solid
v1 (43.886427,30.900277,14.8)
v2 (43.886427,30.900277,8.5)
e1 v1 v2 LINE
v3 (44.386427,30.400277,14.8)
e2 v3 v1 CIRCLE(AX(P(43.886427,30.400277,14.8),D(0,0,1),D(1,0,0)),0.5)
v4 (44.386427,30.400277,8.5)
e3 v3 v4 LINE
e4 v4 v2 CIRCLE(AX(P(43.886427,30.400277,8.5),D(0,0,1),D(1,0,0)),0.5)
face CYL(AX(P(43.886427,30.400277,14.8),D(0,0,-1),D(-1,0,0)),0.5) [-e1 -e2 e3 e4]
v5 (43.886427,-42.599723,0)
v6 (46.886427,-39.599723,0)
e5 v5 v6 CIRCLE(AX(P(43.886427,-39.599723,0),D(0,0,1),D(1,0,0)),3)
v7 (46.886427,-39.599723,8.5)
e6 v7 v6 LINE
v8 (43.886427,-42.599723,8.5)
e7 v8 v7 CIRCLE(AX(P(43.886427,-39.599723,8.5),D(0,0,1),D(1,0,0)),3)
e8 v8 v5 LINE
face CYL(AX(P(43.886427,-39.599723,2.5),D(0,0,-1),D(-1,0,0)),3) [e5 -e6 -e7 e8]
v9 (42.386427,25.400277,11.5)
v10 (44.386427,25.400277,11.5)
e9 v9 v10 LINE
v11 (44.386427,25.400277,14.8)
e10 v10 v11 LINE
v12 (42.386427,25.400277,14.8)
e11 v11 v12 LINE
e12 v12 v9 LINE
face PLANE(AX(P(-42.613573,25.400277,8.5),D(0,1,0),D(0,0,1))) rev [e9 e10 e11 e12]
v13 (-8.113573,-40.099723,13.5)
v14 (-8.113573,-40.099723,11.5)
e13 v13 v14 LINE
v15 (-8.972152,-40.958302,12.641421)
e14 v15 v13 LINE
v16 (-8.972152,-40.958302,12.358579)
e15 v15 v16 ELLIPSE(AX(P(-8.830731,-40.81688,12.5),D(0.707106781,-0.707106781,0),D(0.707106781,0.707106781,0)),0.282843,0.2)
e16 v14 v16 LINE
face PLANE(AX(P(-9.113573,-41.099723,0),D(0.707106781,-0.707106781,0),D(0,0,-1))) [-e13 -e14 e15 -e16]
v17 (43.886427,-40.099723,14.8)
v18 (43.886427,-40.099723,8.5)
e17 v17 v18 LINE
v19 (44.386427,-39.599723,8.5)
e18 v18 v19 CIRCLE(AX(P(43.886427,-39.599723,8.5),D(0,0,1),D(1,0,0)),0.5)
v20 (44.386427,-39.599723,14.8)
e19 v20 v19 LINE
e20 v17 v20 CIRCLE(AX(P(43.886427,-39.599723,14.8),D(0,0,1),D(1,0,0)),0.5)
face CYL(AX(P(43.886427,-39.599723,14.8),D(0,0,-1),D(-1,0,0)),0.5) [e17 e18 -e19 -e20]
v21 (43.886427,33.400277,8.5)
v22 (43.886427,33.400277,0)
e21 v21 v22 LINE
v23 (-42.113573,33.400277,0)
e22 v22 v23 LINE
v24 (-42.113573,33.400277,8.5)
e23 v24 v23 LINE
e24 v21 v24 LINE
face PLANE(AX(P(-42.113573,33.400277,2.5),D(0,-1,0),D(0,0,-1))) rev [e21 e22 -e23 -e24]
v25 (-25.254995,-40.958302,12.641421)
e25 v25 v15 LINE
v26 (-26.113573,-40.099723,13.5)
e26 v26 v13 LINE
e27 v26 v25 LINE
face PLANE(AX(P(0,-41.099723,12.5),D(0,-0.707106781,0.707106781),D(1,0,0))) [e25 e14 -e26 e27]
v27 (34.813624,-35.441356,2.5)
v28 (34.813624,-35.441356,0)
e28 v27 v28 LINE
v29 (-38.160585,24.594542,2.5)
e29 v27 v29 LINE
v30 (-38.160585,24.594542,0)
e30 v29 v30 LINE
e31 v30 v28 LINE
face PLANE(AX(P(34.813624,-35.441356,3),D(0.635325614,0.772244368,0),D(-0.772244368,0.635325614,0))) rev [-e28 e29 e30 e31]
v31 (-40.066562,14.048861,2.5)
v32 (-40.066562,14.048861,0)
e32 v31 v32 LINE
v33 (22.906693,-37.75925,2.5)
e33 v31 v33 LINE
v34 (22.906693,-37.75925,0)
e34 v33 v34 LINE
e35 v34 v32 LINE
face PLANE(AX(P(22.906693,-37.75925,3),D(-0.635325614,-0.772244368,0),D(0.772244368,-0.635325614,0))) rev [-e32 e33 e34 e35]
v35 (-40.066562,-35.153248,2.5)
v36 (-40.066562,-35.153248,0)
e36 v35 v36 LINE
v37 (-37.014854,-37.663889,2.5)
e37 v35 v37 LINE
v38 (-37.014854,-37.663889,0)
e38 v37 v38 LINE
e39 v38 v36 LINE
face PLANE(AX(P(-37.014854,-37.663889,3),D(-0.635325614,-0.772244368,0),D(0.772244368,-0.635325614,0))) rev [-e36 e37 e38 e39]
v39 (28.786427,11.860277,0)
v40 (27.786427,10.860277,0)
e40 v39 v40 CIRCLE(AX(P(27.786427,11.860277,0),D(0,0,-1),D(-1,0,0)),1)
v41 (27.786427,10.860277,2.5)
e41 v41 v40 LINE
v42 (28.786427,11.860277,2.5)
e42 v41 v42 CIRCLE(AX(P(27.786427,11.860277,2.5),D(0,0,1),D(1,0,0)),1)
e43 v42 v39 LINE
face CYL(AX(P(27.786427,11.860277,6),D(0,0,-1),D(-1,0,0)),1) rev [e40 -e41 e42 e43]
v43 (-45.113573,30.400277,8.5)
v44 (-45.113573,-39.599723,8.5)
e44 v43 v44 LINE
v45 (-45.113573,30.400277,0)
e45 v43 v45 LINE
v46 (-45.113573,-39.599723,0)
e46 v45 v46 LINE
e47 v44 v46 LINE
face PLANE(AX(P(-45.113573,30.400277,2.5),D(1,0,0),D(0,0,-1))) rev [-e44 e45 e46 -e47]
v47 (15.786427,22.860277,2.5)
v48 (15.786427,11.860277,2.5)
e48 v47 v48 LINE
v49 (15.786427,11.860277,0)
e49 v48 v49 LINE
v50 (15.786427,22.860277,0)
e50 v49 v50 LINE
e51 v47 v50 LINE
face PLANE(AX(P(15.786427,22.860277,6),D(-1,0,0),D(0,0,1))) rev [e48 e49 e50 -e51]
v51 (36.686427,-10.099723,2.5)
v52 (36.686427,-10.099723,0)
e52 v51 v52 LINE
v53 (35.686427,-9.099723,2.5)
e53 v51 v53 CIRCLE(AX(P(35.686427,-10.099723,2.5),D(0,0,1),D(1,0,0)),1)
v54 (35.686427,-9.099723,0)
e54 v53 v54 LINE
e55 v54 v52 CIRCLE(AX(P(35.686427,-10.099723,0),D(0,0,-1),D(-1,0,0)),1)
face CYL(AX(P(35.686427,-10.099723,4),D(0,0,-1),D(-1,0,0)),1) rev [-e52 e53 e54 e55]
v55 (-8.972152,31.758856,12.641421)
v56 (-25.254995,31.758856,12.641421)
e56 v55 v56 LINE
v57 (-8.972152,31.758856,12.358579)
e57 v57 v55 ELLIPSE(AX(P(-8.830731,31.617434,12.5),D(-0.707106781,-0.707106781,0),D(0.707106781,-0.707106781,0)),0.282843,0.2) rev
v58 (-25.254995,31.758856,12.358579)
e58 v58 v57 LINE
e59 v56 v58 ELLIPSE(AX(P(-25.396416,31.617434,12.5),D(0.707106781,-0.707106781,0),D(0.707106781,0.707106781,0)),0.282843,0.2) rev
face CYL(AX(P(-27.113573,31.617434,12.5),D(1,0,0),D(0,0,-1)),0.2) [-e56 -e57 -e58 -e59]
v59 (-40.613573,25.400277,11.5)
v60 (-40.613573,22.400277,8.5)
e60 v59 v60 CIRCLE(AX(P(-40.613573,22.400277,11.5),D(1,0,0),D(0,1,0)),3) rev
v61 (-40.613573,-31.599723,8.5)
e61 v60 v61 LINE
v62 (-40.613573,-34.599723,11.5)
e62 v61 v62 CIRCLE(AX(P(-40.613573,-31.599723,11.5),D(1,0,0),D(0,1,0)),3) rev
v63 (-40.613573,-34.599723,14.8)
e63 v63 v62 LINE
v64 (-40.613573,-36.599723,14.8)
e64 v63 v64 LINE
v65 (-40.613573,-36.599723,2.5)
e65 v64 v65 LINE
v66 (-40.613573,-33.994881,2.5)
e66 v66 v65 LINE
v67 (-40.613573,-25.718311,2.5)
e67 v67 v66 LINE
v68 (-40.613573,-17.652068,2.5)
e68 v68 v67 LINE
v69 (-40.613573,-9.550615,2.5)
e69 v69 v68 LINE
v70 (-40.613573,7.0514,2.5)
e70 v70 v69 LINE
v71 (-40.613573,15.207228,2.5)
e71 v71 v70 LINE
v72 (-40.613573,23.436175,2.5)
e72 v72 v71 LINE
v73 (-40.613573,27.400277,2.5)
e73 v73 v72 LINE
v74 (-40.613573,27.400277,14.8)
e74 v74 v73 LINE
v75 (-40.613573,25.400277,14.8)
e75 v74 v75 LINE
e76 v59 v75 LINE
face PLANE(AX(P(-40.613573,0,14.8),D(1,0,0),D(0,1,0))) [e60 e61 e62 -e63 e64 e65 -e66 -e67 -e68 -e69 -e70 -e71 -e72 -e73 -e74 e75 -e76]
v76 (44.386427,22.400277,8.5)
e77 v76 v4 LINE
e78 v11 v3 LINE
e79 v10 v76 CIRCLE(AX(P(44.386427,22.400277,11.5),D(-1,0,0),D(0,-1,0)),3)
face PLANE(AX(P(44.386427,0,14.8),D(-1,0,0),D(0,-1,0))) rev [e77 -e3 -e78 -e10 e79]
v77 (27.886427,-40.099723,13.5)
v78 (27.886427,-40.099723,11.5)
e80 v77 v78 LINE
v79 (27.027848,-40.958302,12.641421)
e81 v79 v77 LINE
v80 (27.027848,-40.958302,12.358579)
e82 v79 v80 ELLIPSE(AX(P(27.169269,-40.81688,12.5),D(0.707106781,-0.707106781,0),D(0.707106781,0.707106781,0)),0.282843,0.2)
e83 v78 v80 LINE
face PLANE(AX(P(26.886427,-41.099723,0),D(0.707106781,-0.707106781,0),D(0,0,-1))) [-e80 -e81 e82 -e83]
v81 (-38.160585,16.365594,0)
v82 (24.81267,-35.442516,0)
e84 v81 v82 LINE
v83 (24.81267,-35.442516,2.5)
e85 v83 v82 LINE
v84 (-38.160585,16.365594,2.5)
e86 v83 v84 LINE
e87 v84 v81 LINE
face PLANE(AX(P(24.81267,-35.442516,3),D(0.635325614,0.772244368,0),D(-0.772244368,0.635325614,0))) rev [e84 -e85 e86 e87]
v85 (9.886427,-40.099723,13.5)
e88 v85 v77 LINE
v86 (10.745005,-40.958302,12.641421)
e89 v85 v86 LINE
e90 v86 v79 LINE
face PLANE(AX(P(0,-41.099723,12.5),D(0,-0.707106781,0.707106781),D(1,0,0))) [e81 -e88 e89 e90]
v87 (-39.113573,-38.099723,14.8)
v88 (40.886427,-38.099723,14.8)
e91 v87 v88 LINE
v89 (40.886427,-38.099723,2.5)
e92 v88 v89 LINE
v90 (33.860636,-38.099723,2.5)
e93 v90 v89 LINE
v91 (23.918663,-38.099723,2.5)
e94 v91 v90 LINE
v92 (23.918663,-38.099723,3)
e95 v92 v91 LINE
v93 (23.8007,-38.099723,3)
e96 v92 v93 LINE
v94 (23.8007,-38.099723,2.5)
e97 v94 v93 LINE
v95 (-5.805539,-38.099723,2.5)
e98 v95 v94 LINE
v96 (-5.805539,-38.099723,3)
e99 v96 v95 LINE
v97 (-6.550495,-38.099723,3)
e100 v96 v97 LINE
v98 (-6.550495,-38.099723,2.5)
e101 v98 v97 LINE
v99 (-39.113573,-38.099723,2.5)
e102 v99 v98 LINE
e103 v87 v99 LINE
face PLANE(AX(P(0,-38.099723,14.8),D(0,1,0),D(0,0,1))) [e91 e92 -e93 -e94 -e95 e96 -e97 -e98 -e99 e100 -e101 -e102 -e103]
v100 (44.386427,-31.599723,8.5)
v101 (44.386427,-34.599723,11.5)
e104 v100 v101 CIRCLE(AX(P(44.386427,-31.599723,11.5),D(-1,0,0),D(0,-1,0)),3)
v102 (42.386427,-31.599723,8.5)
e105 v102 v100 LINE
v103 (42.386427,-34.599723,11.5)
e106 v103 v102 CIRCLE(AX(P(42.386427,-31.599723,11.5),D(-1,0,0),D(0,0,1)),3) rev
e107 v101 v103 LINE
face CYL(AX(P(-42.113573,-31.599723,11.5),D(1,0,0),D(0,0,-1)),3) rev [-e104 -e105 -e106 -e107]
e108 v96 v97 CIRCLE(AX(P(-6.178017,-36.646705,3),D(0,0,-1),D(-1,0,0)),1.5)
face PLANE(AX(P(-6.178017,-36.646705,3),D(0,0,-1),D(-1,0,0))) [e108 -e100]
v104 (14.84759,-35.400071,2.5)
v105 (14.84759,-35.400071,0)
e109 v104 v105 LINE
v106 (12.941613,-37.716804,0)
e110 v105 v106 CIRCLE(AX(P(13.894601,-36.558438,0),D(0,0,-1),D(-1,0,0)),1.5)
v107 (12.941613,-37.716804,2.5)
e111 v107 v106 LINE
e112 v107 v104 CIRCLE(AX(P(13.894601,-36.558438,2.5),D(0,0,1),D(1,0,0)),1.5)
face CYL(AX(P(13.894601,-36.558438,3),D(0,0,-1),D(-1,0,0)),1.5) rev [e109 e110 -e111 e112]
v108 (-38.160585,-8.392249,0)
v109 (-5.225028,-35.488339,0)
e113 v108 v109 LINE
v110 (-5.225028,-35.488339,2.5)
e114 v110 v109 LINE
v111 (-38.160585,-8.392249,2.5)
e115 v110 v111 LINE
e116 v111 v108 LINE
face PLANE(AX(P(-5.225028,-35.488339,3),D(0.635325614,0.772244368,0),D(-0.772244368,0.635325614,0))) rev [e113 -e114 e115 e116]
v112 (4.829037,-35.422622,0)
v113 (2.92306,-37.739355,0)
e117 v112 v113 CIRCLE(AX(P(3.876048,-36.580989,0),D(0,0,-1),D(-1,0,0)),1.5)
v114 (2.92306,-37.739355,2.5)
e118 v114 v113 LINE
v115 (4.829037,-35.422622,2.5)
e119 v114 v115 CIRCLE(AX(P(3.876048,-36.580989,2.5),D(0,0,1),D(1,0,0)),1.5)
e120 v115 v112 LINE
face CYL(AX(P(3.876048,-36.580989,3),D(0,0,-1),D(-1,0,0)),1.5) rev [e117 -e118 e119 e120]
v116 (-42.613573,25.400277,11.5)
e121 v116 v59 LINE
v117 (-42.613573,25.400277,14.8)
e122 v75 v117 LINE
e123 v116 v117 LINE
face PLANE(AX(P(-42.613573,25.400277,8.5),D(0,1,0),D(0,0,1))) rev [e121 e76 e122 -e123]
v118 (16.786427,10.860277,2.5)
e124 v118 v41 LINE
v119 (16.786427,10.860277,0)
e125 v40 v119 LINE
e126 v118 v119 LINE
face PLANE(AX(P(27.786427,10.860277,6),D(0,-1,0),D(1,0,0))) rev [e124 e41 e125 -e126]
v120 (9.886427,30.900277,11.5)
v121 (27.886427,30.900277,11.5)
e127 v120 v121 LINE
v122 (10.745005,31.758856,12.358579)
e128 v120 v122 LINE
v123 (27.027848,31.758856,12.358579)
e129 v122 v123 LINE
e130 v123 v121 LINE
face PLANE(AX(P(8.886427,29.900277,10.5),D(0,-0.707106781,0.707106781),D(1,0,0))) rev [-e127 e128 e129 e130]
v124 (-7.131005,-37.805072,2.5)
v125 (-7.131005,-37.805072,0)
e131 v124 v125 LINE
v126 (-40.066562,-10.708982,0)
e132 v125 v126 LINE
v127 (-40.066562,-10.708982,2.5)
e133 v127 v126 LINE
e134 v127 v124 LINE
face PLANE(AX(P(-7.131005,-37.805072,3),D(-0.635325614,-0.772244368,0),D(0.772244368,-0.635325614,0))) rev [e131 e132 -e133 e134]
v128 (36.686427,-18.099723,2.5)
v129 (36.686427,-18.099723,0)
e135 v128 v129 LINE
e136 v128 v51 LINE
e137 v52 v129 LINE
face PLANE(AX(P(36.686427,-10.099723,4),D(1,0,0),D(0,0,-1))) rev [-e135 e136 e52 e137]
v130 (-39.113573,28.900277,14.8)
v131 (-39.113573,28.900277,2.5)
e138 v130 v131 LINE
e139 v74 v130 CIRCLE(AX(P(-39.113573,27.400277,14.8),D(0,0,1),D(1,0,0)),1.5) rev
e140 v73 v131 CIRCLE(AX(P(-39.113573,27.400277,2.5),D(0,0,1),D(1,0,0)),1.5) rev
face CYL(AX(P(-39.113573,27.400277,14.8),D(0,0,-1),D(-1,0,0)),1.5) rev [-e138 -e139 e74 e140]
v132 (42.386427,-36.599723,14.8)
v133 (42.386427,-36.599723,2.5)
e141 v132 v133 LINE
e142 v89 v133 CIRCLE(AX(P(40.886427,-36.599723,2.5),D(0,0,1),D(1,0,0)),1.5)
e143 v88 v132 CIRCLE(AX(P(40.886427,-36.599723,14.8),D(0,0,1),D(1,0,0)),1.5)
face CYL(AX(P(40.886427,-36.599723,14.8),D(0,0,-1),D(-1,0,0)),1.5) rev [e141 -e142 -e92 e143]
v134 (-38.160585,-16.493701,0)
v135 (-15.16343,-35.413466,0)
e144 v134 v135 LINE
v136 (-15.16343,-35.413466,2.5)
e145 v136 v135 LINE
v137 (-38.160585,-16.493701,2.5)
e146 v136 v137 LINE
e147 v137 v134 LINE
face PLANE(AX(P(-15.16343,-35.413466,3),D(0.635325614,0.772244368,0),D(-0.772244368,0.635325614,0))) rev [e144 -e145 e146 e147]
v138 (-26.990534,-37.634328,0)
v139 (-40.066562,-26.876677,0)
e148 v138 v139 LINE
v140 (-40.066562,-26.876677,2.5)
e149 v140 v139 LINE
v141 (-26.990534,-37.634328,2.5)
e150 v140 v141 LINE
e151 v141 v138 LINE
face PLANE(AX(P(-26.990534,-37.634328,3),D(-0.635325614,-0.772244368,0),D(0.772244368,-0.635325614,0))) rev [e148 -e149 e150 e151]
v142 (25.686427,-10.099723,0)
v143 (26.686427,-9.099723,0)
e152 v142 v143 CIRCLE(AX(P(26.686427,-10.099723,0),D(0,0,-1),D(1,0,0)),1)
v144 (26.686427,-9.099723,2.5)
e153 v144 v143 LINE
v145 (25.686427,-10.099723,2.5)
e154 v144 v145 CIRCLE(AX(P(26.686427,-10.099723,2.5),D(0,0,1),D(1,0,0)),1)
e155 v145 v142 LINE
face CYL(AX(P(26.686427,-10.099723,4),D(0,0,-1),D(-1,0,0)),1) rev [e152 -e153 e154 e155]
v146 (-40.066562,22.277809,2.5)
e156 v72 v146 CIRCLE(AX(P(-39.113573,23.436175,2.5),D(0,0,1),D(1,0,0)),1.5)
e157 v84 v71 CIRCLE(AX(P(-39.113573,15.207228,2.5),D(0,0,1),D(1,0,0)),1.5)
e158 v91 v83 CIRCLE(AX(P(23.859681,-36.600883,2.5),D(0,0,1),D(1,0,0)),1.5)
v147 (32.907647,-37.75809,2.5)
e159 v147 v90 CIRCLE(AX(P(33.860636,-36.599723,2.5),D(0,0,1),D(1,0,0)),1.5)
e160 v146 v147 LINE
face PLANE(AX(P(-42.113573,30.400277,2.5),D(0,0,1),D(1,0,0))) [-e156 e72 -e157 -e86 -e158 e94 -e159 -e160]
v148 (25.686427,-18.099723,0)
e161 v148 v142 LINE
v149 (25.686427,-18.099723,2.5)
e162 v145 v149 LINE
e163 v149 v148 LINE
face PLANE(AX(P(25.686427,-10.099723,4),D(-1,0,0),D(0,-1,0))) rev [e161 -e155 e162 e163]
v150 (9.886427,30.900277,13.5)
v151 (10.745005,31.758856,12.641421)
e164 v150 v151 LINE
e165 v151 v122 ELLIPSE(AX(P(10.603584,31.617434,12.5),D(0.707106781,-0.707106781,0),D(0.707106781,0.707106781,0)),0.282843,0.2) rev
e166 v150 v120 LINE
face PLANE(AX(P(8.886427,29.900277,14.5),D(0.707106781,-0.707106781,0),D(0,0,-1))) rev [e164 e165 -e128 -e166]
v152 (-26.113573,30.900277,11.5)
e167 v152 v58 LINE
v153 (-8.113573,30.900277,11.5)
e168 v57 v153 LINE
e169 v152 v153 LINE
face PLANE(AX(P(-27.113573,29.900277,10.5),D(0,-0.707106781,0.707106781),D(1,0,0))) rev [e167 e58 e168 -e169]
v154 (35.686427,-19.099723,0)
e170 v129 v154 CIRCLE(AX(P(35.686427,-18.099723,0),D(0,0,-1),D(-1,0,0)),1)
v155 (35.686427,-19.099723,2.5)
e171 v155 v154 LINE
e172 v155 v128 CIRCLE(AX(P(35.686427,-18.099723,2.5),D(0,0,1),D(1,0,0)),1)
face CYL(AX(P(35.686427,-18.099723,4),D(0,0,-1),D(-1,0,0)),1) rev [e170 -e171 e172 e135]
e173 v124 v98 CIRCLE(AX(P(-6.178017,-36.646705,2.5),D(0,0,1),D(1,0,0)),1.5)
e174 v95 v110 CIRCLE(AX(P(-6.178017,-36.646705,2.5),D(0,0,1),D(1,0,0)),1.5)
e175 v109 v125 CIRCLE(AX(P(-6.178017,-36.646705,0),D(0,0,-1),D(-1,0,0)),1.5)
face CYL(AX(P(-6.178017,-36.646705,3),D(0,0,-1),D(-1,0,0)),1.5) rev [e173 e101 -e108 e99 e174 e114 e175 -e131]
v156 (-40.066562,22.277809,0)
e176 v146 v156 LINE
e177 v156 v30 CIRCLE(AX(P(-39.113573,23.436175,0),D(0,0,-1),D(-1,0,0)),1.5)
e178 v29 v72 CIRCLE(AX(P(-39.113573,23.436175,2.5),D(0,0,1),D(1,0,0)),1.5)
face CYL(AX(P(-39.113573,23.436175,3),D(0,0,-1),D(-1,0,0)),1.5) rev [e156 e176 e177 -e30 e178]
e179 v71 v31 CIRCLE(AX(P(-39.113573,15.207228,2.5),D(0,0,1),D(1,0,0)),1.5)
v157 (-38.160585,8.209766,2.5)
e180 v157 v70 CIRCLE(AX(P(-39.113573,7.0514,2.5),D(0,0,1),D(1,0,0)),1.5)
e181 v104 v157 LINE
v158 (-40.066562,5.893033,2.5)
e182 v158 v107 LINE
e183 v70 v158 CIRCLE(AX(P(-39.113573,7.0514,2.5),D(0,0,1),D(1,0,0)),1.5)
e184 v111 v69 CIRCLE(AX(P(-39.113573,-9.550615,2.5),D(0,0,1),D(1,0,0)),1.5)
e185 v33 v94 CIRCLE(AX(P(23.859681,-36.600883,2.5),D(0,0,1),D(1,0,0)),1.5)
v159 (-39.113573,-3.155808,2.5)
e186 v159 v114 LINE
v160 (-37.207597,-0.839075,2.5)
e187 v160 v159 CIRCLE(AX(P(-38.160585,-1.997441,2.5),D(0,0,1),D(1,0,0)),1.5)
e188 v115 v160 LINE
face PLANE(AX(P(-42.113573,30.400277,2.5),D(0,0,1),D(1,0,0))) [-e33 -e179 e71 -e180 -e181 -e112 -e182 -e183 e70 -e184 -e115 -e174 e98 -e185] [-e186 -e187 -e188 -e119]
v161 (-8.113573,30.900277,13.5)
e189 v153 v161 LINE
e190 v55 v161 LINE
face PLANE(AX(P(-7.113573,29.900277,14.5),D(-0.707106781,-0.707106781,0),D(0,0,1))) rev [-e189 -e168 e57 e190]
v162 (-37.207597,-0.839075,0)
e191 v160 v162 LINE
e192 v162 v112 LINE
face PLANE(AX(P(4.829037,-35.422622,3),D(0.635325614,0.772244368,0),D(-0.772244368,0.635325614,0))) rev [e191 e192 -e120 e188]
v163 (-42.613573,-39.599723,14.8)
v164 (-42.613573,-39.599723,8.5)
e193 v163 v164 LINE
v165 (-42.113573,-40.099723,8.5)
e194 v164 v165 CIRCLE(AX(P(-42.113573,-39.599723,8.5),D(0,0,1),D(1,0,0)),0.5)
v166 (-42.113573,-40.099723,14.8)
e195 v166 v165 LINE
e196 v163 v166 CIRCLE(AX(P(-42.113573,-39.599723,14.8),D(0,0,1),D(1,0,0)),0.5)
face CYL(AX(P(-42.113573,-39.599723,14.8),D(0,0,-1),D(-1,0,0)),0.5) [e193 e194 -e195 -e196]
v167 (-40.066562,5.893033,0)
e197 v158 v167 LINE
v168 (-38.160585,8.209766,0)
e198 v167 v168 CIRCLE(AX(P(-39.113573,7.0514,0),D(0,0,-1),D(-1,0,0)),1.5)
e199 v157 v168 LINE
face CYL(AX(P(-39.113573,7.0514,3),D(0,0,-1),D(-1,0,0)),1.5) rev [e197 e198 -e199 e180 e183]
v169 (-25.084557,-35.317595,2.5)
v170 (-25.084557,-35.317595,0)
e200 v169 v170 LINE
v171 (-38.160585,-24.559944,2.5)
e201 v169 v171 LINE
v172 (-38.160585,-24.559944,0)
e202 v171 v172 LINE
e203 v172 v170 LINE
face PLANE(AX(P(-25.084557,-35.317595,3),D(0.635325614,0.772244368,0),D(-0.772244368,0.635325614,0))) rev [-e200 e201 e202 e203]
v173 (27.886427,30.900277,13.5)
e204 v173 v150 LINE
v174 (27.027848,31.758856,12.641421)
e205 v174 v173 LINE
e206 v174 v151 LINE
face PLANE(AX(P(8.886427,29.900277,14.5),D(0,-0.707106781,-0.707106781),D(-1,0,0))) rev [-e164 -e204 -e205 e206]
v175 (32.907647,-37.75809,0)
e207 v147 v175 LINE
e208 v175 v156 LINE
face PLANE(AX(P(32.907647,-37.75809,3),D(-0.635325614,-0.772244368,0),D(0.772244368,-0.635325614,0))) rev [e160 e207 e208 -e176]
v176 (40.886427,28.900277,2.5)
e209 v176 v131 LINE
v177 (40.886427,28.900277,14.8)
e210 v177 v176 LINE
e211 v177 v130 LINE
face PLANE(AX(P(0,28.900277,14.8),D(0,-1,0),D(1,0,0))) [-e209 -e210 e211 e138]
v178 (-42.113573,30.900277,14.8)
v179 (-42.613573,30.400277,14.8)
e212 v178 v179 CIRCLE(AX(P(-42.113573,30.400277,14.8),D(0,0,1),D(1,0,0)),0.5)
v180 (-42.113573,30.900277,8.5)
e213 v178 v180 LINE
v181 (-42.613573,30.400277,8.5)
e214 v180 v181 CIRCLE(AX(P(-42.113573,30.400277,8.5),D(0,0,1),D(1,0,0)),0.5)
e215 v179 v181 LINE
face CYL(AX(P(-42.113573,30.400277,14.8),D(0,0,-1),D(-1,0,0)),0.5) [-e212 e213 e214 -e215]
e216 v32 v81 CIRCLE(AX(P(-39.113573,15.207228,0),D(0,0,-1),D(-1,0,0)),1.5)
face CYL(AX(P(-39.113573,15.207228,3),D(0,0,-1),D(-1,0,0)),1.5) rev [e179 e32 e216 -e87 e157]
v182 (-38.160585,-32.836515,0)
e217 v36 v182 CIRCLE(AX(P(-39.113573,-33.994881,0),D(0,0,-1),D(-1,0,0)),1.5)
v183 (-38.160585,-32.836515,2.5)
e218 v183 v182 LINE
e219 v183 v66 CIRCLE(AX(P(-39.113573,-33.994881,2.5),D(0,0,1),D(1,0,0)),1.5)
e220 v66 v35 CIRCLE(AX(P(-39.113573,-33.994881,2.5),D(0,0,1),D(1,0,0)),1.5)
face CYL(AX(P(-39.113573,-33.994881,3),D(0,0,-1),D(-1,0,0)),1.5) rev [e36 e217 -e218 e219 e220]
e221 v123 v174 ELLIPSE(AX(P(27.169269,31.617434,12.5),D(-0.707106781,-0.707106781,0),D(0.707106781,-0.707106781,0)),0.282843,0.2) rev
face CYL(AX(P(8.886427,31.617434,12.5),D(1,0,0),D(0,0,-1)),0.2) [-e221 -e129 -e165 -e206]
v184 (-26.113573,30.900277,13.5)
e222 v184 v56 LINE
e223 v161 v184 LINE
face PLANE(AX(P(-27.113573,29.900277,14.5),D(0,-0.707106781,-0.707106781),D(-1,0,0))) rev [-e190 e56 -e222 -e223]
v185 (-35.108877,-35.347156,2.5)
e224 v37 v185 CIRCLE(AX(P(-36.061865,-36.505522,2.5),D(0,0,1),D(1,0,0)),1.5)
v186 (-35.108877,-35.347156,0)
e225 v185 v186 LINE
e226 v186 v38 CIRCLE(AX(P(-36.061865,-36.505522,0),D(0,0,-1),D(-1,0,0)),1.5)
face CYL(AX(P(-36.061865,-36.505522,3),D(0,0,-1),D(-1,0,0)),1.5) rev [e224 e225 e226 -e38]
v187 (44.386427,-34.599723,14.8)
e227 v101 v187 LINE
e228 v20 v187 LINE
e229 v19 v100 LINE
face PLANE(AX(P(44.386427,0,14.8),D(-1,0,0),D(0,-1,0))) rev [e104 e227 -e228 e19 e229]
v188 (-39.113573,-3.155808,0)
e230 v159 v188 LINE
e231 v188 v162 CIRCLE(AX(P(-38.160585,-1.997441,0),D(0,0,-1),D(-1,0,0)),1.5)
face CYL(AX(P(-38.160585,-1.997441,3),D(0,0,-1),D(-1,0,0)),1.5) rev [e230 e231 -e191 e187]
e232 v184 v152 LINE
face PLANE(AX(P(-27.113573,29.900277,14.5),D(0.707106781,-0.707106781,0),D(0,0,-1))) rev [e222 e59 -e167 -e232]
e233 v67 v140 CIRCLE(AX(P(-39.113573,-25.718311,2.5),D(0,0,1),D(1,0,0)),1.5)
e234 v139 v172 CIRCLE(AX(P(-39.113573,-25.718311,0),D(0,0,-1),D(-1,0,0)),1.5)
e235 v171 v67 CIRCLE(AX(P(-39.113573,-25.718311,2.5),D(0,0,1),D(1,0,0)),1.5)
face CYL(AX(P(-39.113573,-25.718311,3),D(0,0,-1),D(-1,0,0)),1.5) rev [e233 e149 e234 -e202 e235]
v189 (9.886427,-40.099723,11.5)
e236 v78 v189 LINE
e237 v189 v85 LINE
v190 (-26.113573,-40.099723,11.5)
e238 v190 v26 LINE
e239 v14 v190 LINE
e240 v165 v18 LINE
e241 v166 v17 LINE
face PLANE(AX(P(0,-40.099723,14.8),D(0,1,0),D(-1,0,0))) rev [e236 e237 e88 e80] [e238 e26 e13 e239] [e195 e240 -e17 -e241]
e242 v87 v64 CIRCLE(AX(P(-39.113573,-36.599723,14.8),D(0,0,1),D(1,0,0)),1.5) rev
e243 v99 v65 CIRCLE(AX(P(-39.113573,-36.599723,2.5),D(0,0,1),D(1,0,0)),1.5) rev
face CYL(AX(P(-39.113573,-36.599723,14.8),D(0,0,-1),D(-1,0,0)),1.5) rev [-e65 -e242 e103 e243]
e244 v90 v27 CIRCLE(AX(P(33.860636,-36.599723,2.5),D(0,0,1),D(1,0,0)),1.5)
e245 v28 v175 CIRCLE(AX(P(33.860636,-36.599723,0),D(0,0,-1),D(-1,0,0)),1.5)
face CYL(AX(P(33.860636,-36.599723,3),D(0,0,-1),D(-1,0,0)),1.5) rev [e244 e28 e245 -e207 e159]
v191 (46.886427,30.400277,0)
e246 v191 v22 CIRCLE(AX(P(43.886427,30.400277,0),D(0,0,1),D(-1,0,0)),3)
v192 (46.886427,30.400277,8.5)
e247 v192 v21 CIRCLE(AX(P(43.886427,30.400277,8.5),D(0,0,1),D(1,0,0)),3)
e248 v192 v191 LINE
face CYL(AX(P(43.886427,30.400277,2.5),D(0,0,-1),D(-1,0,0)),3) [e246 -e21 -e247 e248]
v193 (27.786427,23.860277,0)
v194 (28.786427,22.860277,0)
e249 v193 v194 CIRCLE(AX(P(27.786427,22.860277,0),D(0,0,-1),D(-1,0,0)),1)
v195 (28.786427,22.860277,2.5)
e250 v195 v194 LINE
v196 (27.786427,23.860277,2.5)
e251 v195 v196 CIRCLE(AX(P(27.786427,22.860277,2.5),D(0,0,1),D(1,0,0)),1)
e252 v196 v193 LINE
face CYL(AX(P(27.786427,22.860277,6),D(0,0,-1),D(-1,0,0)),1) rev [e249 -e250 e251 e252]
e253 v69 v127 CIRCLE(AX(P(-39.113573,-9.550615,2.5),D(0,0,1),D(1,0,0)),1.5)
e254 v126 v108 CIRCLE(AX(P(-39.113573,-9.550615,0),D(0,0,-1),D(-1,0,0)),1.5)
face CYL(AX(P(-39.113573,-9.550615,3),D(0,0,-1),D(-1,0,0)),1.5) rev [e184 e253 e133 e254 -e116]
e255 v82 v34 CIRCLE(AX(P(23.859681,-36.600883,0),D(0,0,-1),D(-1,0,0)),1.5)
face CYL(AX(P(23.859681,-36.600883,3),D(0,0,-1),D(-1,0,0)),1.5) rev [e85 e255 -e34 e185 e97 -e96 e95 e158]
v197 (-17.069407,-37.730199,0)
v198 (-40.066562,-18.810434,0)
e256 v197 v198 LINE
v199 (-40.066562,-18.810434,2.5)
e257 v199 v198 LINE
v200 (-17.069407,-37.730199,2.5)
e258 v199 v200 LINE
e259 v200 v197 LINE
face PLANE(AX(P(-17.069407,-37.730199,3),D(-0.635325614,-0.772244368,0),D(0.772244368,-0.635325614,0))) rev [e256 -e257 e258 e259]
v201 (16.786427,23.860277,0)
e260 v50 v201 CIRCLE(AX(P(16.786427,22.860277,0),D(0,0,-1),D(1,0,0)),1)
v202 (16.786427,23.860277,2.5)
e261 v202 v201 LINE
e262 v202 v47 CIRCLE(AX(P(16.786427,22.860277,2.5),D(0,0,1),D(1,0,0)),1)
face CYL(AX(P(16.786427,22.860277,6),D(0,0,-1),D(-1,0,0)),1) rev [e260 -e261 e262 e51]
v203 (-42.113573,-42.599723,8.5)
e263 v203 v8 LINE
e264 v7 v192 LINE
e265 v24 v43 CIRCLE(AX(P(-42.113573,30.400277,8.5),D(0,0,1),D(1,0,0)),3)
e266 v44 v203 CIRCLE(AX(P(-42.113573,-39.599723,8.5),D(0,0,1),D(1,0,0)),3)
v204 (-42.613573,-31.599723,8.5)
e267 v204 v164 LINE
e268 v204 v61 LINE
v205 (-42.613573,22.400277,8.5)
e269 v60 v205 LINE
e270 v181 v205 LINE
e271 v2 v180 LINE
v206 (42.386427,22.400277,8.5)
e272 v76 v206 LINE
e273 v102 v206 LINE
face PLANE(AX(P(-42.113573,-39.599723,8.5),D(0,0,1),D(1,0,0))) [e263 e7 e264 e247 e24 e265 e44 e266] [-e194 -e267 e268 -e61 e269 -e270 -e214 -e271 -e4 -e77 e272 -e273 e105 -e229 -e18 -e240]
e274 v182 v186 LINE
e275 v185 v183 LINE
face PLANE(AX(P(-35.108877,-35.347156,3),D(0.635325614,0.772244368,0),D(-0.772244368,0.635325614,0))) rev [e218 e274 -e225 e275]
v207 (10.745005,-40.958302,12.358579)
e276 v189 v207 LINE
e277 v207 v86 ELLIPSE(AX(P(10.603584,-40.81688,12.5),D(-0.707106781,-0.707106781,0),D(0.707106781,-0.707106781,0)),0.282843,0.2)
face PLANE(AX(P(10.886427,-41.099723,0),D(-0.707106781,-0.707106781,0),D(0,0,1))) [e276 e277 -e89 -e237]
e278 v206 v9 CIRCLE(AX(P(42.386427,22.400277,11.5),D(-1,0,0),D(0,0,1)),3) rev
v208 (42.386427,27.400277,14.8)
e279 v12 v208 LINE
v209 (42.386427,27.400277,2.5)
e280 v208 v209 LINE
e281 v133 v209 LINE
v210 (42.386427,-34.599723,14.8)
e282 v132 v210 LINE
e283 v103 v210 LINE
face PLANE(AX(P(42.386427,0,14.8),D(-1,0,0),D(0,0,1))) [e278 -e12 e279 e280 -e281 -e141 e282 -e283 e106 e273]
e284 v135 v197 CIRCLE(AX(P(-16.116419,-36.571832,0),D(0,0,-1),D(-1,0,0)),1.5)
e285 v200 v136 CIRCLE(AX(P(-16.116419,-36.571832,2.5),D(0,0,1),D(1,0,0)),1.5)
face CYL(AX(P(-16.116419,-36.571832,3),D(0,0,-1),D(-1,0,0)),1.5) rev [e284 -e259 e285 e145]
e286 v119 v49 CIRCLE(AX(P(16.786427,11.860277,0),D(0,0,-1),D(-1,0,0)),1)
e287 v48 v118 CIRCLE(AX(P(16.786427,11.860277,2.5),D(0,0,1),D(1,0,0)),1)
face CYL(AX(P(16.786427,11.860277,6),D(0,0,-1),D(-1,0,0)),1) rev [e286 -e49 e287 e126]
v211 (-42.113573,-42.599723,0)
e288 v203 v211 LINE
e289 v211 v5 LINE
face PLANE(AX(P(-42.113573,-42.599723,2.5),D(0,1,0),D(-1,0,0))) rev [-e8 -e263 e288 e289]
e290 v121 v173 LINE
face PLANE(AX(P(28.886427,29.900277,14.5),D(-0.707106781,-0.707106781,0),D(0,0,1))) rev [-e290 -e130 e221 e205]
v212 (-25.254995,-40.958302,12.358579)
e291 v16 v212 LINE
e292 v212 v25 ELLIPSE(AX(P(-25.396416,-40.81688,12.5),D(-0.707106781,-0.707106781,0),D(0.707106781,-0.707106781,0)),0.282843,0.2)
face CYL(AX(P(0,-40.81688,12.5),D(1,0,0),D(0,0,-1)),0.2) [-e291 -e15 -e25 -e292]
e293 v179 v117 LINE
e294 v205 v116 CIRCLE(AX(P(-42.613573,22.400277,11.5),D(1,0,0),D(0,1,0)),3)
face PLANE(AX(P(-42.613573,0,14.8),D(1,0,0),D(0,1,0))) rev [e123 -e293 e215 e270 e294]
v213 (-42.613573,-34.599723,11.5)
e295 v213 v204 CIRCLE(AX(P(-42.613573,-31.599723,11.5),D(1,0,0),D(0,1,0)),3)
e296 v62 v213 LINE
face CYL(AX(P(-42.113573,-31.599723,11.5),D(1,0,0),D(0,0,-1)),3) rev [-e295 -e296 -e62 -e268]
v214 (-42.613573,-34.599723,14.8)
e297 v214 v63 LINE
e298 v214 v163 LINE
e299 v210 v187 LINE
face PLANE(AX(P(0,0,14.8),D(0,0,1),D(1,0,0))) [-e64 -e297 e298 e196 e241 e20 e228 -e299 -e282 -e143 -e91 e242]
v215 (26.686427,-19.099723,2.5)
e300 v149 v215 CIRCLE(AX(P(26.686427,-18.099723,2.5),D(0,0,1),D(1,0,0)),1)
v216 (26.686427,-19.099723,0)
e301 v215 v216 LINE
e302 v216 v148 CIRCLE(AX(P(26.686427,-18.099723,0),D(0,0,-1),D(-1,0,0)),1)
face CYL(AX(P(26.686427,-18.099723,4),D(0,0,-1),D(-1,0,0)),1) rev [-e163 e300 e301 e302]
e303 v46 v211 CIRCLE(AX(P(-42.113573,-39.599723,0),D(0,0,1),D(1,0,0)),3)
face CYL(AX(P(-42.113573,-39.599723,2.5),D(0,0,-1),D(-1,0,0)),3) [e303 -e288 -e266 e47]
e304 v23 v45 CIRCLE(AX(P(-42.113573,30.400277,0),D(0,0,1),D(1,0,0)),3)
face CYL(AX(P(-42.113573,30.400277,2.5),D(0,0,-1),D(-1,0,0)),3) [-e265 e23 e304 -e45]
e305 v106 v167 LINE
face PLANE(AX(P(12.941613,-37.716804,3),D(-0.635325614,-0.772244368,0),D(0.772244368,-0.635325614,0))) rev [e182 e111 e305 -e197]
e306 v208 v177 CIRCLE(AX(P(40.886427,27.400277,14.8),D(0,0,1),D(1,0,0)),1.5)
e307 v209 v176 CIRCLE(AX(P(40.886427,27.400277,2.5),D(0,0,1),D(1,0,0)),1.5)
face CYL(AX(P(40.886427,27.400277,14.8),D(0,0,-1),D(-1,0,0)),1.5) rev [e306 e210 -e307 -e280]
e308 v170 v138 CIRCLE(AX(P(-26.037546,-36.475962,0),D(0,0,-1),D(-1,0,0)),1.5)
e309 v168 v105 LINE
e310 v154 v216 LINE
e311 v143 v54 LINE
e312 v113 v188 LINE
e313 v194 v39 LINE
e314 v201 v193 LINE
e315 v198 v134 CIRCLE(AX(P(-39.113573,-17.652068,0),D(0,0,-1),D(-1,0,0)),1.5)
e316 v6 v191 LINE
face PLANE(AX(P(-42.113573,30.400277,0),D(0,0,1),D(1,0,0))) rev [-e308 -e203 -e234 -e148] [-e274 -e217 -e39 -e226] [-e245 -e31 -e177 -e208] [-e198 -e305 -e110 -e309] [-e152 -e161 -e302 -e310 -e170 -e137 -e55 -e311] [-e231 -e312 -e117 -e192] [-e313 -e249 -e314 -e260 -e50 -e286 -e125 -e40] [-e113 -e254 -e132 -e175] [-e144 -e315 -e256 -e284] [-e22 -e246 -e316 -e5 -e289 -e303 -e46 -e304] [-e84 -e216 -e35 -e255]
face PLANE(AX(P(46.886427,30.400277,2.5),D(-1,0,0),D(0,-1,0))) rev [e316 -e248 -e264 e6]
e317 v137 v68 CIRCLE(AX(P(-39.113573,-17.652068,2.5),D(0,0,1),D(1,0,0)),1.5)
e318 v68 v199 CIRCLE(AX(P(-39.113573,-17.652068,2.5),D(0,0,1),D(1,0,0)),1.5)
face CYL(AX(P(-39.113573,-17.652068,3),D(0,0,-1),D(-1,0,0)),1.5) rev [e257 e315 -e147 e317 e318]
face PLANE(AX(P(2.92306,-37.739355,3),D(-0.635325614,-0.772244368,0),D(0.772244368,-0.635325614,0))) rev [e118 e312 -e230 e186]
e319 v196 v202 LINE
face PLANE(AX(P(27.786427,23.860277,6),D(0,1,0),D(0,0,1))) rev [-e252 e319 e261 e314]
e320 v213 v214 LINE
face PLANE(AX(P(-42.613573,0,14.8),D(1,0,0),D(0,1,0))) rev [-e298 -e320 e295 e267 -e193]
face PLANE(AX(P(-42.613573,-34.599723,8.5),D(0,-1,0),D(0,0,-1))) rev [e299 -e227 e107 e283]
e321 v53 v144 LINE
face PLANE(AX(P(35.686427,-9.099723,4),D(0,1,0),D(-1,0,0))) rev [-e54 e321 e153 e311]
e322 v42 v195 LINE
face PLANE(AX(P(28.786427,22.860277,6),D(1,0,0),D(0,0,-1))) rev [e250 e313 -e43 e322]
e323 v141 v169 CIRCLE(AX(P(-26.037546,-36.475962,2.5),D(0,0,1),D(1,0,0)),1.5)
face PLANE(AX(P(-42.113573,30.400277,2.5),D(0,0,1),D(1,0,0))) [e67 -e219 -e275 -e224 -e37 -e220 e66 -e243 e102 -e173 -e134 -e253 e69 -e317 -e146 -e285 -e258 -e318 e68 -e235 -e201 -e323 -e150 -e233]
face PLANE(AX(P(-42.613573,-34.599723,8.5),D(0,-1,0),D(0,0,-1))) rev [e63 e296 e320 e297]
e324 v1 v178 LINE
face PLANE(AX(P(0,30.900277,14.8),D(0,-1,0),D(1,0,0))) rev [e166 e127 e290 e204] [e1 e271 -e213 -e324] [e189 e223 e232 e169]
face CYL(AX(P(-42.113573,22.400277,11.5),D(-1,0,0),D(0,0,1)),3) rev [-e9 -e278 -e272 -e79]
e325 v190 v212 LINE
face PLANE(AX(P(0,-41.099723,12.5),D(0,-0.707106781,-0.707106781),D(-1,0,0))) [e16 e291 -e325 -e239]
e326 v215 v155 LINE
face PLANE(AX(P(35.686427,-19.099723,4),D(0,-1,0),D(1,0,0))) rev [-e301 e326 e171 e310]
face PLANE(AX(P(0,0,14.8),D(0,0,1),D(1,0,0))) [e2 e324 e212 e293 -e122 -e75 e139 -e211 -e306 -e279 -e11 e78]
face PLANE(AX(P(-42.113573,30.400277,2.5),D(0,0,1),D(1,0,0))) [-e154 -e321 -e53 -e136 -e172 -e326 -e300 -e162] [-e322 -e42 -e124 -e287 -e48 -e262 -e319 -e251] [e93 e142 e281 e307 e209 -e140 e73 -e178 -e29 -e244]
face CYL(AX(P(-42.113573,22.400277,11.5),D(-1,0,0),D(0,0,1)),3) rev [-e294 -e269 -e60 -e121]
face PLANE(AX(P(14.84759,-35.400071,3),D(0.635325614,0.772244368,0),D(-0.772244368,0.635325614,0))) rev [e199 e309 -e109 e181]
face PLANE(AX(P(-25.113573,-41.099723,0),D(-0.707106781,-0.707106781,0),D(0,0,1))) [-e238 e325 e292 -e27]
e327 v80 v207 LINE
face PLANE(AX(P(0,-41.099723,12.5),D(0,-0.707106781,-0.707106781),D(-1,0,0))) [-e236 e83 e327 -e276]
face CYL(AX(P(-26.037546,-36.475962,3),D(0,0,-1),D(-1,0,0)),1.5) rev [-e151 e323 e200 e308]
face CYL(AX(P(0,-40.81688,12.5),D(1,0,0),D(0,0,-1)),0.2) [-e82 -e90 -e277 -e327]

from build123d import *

# Parameters (mm, degrees)
EXTRUDE_1_DEPTH     = 2.5
EXTRUDE_6_DEPTH     = 6
EXTRUDE_7_DEPTH     = 12.3
SKETCH_7_W          = 20
SKETCH_7_H          = 4
EXTRUDE_8_DEPTH     = 1
CHAMFER_12_SIZE     = 2
CHAMFER_13_SIZE     = 2
FILLET_4_R          = 0.2
FILLET_5_R          = 0.2
MIRROR_START        = 8.886426593
MIRROR_1_OUTLINE_W  = 1
MIRROR_1_OUTLINE_H  = 4
MIRROR_1_DEPTH      = 20
MIRROR_START_2      = -26.113573407
MIRROR_1_2_DEPTH    = 18
MIRROR_START_3      = 11
MIRROR_1_3_DEPTH    = 3
CHAMFER_14_SIZE     = 2
FILLET_6_R          = 0.2
SKETCH_8_W          = 87
SKETCH_8_H          = 60
CUT_EXTRUDE_1_DEPTH = 6.3
FILLET_7_R          = 3
FILLET_8_R          = 3
FILLET_9_R          = 3
FILLET_10_R         = 3
CUT_EXTRUDE_2_DEPTH = 4
CUT_EXTRUDE_4_DEPTH = 6
CUT_EXTRUDE_5_DEPTH = 3


with BuildPart() as part:
    # 草图1 → 凸台-拉伸1 (new body)
    with BuildSketch(Plane.XY):
        with BuildLine():
            Line((-42.113573407, 33.400277008), (43.886426593, 33.400277008))
            ThreePointArc((43.886426593, 33.400277008), (46.007746936, 32.521597352), (46.886426593, 30.400277008))
            Line((46.886426593, 30.400277008), (46.886426593, -39.599722992))
            ThreePointArc((46.886426593, -39.599722992), (46.007746936, -41.721043335), (43.886426593, -42.599722992))
            Line((43.886426593, -42.599722992), (-42.113573407, -42.599722992))
            ThreePointArc((-42.113573407, -42.599722992), (-44.234893751, -41.721043335), (-45.113573407, -39.599722992))
            Line((-45.113573407, -39.599722992), (-45.113573407, 30.400277008))
            ThreePointArc((-45.113573407, 30.400277008), (-44.234893751, 32.521597352), (-42.113573407, 33.400277008))
        make_face()
    extrude(amount=EXTRUDE_1_DEPTH)

    # 草图2 → 凸台-拉伸6 (add)
    with BuildSketch(Plane.XY.offset(2.5)):
        with BuildLine():
            Line((-42.113573407, -42.599722992), (43.886426593, -42.599722992))
            ThreePointArc((43.886426593, -42.599722992), (46.007746936, -41.721043335), (46.886426593, -39.599722992))
            Line((46.886426593, -39.599722992), (46.886426593, 30.400277008))
            ThreePointArc((46.886426593, 30.400277008), (46.007746936, 32.521597352), (43.886426593, 33.400277008))
            Line((43.886426593, 33.400277008), (-42.113573407, 33.400277008))
            ThreePointArc((-42.113573407, 33.400277008), (-44.234893751, 32.521597352), (-45.113573407, 30.400277008))
            Line((-45.113573407, 30.400277008), (-45.113573407, -39.599722992))
            ThreePointArc((-45.113573407, -39.599722992), (-44.234893751, -41.721043335), (-42.113573407, -42.599722992))
        make_face()
        with BuildLine():
            Line((43.886426593, 30.900277008), (-42.113573407, 30.900277008))
            ThreePointArc((-42.113573407, 30.900277008), (-42.467126798, 30.753830399), (-42.613573407, 30.400277008))
            Line((-42.613573407, 30.400277008), (-42.613573407, -39.599722992))
            ThreePointArc((-42.613573407, -39.599722992), (-42.467126798, -39.953276382), (-42.113573407, -40.099722992))
            Line((-42.113573407, -40.099722992), (43.886426593, -40.099722992))
            ThreePointArc((43.886426593, -40.099722992), (44.239979983, -39.953276382), (44.386426593, -39.599722992))
            Line((44.386426593, -39.599722992), (44.386426593, 30.400277008))
            ThreePointArc((44.386426593, 30.400277008), (44.239979983, 30.753830399), (43.886426593, 30.900277008))
        make_face(mode=Mode.SUBTRACT)
    extrude(amount=EXTRUDE_6_DEPTH)

    # 草图6 → 凸台-拉伸7 (add)
    with BuildSketch(Plane.XY.offset(2.5)):
        with BuildLine():
            Line((44.386426593, -39.599722992), (44.386426593, 30.400277008))
            ThreePointArc((44.386426593, 30.400277008), (44.239979983, 30.753830399), (43.886426593, 30.900277008))
            Line((43.886426593, 30.900277008), (-42.113573407, 30.900277008))
            ThreePointArc((-42.113573407, 30.900277008), (-42.467126798, 30.753830399), (-42.613573407, 30.400277008))
            Line((-42.613573407, 30.400277008), (-42.613573407, -39.599722992))
            ThreePointArc((-42.613573407, -39.599722992), (-42.467126798, -39.953276382), (-42.113573407, -40.099722992))
            Line((-42.113573407, -40.099722992), (43.886426593, -40.099722992))
            ThreePointArc((43.886426593, -40.099722992), (44.239979983, -39.953276382), (44.386426593, -39.599722992))
        make_face()
        with BuildLine():
            Line((-40.613573407, 27.400277008), (-40.613573407, -36.599722992))
            ThreePointArc((-40.613573407, -36.599722992), (-40.174233579, -37.660383163), (-39.113573407, -38.099722992))
            Line((-39.113573407, -38.099722992), (40.886426593, -38.099722992))
            ThreePointArc((40.886426593, -38.099722992), (41.947086765, -37.660383163), (42.386426593, -36.599722992))
            Line((42.386426593, -36.599722992), (42.386426593, 27.400277008))
            ThreePointArc((42.386426593, 27.400277008), (41.947086765, 28.46093718), (40.886426593, 28.900277008))
            Line((40.886426593, 28.900277008), (-39.113573407, 28.900277008))
            ThreePointArc((-39.113573407, 28.900277008), (-40.174233579, 28.46093718), (-40.613573407, 27.400277008))
        make_face(mode=Mode.SUBTRACT)
    extrude(amount=EXTRUDE_7_DEPTH)

    # 草图7 → 凸台-拉伸8 (add)
    with BuildSketch(Plane.XZ.offset(40.099722992)):
        with Locations((-17.113573407, 12.5)):
            Rectangle(SKETCH_7_W, SKETCH_7_H)
        with Locations((18.886426593, 12.5)):
            Rectangle(SKETCH_7_W, SKETCH_7_H)
    extrude(amount=EXTRUDE_8_DEPTH)

    # 倒角12
    # the kernel refuses this chamfer: 2 mm, written as the material it takes off along each edge
    with BuildSketch(Plane(origin=(-32.256939383, -41.099722992, 14.5), x_dir=(0, 1, 0), z_dir=(1, 0, 0))) as chamfer_12_piece_1_section:
        Polygon((CHAMFER_12_SIZE, 0), (0, -CHAMFER_12_SIZE), (0, 0), align=None)
    chamfer_12_piece_1 = extrude(amount=30.286731952, mode=Mode.PRIVATE)
    chamfer_12_piece_1 = split(chamfer_12_piece_1, bisect_by=Plane(origin=(-32.256939383, -40.099722992, 14.5), z_dir=(0, -1, 0)), keep=Keep.TOP, mode=Mode.PRIVATE)
    add(chamfer_12_piece_1, mode=Mode.SUBTRACT)
    with BuildSketch(Plane(origin=(-7.113573407, -41.099722992, 19.643365976), x_dir=(0, 1, 0), z_dir=(0, 0, -1))) as chamfer_12_piece_2_section:
        Polygon((CHAMFER_12_SIZE, 0), (0, -CHAMFER_12_SIZE), (0, 0), align=None)
    chamfer_12_piece_2 = extrude(amount=9.143365976, mode=Mode.PRIVATE)
    chamfer_12_piece_2 = split(chamfer_12_piece_2, bisect_by=Plane(origin=(-7.113573407, -40.099722992, 19.643365976), z_dir=(0, -1, 0)), keep=Keep.TOP, mode=Mode.PRIVATE)
    add(chamfer_12_piece_2, mode=Mode.SUBTRACT)
    with BuildSketch(Plane(origin=(-1.970207431, -41.099722992, 10.5), x_dir=(0, 1, 0), z_dir=(-1, 0, 0))) as chamfer_12_piece_3_section:
        Polygon((CHAMFER_12_SIZE, 0), (0, -CHAMFER_12_SIZE), (0, 0), align=None)
    chamfer_12_piece_3 = extrude(amount=30.286731952, mode=Mode.PRIVATE)
    chamfer_12_piece_3 = split(chamfer_12_piece_3, bisect_by=Plane(origin=(-1.970207431, -40.099722992, 10.5), z_dir=(0, -1, 0)), keep=Keep.TOP, mode=Mode.PRIVATE)
    add(chamfer_12_piece_3, mode=Mode.SUBTRACT)
    with BuildSketch(Plane(origin=(-27.113573407, -41.099722992, 10.5), x_dir=(0, 1, 0), z_dir=(0, 0, 1))) as chamfer_12_piece_4_section:
        Polygon((CHAMFER_12_SIZE, 0), (0, -CHAMFER_12_SIZE), (0, 0), align=None)
    chamfer_12_piece_4 = extrude(amount=9.143365976, mode=Mode.PRIVATE)
    chamfer_12_piece_4 = split(chamfer_12_piece_4, bisect_by=Plane(origin=(-27.113573407, -40.099722992, 10.5), z_dir=(0, -1, 0)), keep=Keep.TOP, mode=Mode.PRIVATE)
    add(chamfer_12_piece_4, mode=Mode.SUBTRACT)

    # 倒角13
    # the kernel refuses this chamfer: 2 mm, written as the material it takes off along each edge
    with BuildSketch(Plane(origin=(3.743060617, -41.099722992, 14.5), x_dir=(0, 0, -1), z_dir=(1, 0, 0))) as chamfer_13_piece_1_section:
        Polygon((CHAMFER_13_SIZE, 0), (0, CHAMFER_13_SIZE), (0, 0), align=None)
    chamfer_13_piece_1 = extrude(amount=30.286731952, mode=Mode.PRIVATE)
    chamfer_13_piece_1 = split(chamfer_13_piece_1, bisect_by=Plane(origin=(3.743060617, -40.099722992, 14.5), z_dir=(0, -1, 0)), keep=Keep.TOP, mode=Mode.PRIVATE)
    add(chamfer_13_piece_1, mode=Mode.SUBTRACT)
    with BuildSketch(Plane(origin=(28.886426593, -41.099722992, 19.643365976), x_dir=(0, 1, 0), z_dir=(0, 0, -1))) as chamfer_13_piece_2_section:
        Polygon((CHAMFER_13_SIZE, 0), (0, -CHAMFER_13_SIZE), (0, 0), align=None)
    chamfer_13_piece_2 = extrude(amount=9.143365976, mode=Mode.PRIVATE)
    chamfer_13_piece_2 = split(chamfer_13_piece_2, bisect_by=Plane(origin=(28.886426593, -40.099722992, 19.643365976), z_dir=(0, -1, 0)), keep=Keep.TOP, mode=Mode.PRIVATE)
    add(chamfer_13_piece_2, mode=Mode.SUBTRACT)
    with BuildSketch(Plane(origin=(34.029792569, -41.099722992, 10.5), x_dir=(0, 0, 1), z_dir=(-1, 0, 0))) as chamfer_13_piece_3_section:
        Polygon((CHAMFER_13_SIZE, 0), (0, CHAMFER_13_SIZE), (0, 0), align=None)
    chamfer_13_piece_3 = extrude(amount=30.286731952, mode=Mode.PRIVATE)
    chamfer_13_piece_3 = split(chamfer_13_piece_3, bisect_by=Plane(origin=(34.029792569, -40.099722992, 10.5), z_dir=(0, -1, 0)), keep=Keep.TOP, mode=Mode.PRIVATE)
    add(chamfer_13_piece_3, mode=Mode.SUBTRACT)
    with BuildSketch(Plane(origin=(8.886426593, -41.099722992, 10.5), x_dir=(1, 0, 0), z_dir=(0, 0, 1))) as chamfer_13_piece_4_section:
        Polygon((CHAMFER_13_SIZE, 0), (0, CHAMFER_13_SIZE), (0, 0), align=None)
    chamfer_13_piece_4 = extrude(amount=9.143365976, mode=Mode.PRIVATE)
    chamfer_13_piece_4 = split(chamfer_13_piece_4, bisect_by=Plane(origin=(8.886426593, -40.099722992, 10.5), z_dir=(0, -1, 0)), keep=Keep.TOP, mode=Mode.PRIVATE)
    add(chamfer_13_piece_4, mode=Mode.SUBTRACT)

    # 圆角4
    fillet_4_edges = [part.edges().sort_by_distance(p)[0] for p in [
        (-17.113573407, -41.099722992, 12.5),
    ]]
    fillet(fillet_4_edges, radius=FILLET_4_R)

    # 圆角5
    fillet_5_edges = [part.edges().sort_by_distance(p)[0] for p in [
        (18.886426593, -41.099722992, 12.5),
    ]]
    fillet(fillet_5_edges, radius=FILLET_5_R)

    # 镜向1: read off the stored shape, not the designer's step
    # 镜向1 outline → 镜向1 (add)
    with BuildSketch(Plane.YZ.offset(MIRROR_START)):
        with Locations((31.400277008, 12.5)):
            Rectangle(MIRROR_1_OUTLINE_W, MIRROR_1_OUTLINE_H)
    extrude(amount=MIRROR_1_DEPTH)

    # Mirror 1 2 outline → Mirror 1 2 (add)
    with BuildSketch(Plane.YZ.offset(MIRROR_START_2)):
        with BuildLine():
            Line((31.758855652, 12.641421356), (30.900277008, 13.5))
            Line((30.900277008, 13.5), (30.900277008, 11.5))
            Line((30.900277008, 11.5), (31.758855652, 12.358578644))
            ThreePointArc((31.758855652, 12.358578644), (31.817434296, 12.5), (31.758855652, 12.641421356))
        make_face()
    extrude(amount=MIRROR_1_2_DEPTH)

    # Mirror 1 3 outline → Mirror 1 3 (cut)
    with BuildSketch(Plane.XY.offset(MIRROR_START_3)):
        Polygon((-26.113573407, 33), (-26.113573407, 30.900277008), (-25.19641612, 31.817434296), (-24.013850417, 33), align=None)
        Polygon((-8.113573407, 33), (-10.213296399, 33), (-8.113573407, 30.900277008), align=None)
    extrude(amount=MIRROR_1_3_DEPTH, mode=Mode.SUBTRACT)

    # 倒角14
    # the kernel refuses this chamfer: 2 mm, written as the material it takes off along each edge
    with BuildSketch(Plane(origin=(3.743060617, 31.900277008, 10.5), x_dir=(0, -1, 0), z_dir=(1, 0, 0))) as chamfer_14_piece_1_section:
        Polygon((CHAMFER_14_SIZE, 0), (0, -CHAMFER_14_SIZE), (0, 0), align=None)
    chamfer_14_piece_1 = extrude(amount=30.286731952, mode=Mode.PRIVATE)
    chamfer_14_piece_1 = split(chamfer_14_piece_1, bisect_by=Plane(origin=(3.743060617, 30.900277008, 10.5), z_dir=(0, 1, 0)), keep=Keep.TOP, mode=Mode.PRIVATE)
    add(chamfer_14_piece_1, mode=Mode.SUBTRACT)
    with BuildSketch(Plane(origin=(28.886426593, 31.900277008, 10.5), x_dir=(0, -1, 0), z_dir=(0, 0, 1))) as chamfer_14_piece_2_section:
        Polygon((CHAMFER_14_SIZE, 0), (0, -CHAMFER_14_SIZE), (0, 0), align=None)
    chamfer_14_piece_2 = extrude(amount=9.143365976, mode=Mode.PRIVATE)
    chamfer_14_piece_2 = split(chamfer_14_piece_2, bisect_by=Plane(origin=(28.886426593, 30.900277008, 10.5), z_dir=(0, 1, 0)), keep=Keep.TOP, mode=Mode.PRIVATE)
    add(chamfer_14_piece_2, mode=Mode.SUBTRACT)
    with BuildSketch(Plane(origin=(3.743060617, 31.900277008, 14.5), x_dir=(0, -1, 0), z_dir=(1, 0, 0))) as chamfer_14_piece_3_section:
        Polygon((CHAMFER_14_SIZE, 0), (0, CHAMFER_14_SIZE), (0, 0), align=None)
    chamfer_14_piece_3 = extrude(amount=30.286731952, mode=Mode.PRIVATE)
    chamfer_14_piece_3 = split(chamfer_14_piece_3, bisect_by=Plane(origin=(3.743060617, 30.900277008, 14.5), z_dir=(0, 1, 0)), keep=Keep.TOP, mode=Mode.PRIVATE)
    add(chamfer_14_piece_3, mode=Mode.SUBTRACT)
    with BuildSketch(Plane(origin=(8.886426593, 31.900277008, 10.5), x_dir=(0, -1, 0), z_dir=(0, 0, 1))) as chamfer_14_piece_4_section:
        Polygon((CHAMFER_14_SIZE, 0), (0, CHAMFER_14_SIZE), (0, 0), align=None)
    chamfer_14_piece_4 = extrude(amount=9.143365976, mode=Mode.PRIVATE)
    chamfer_14_piece_4 = split(chamfer_14_piece_4, bisect_by=Plane(origin=(8.886426593, 30.900277008, 10.5), z_dir=(0, 1, 0)), keep=Keep.TOP, mode=Mode.PRIVATE)
    add(chamfer_14_piece_4, mode=Mode.SUBTRACT)

    # 圆角6
    fillet_6_edges = [part.edges().sort_by_distance(p)[0] for p in [
        (18.886426593, 31.900277008, 12.5),
    ]]
    fillet(fillet_6_edges, radius=FILLET_6_R)

    # 草图8 → 切除-拉伸1 (cut)
    with BuildSketch(Plane.XY.offset(14.8)):
        with Locations((0.886426593, -4.599722992)):
            Rectangle(SKETCH_8_W, SKETCH_8_H)
    extrude(amount=-CUT_EXTRUDE_1_DEPTH, mode=Mode.SUBTRACT)

    # 圆角7
    fillet_7_edges = [part.edges().sort_by_distance(p)[0] for p in [
        (-41.613573407, 25.400277008, 8.5),
    ]]
    fillet(fillet_7_edges, radius=FILLET_7_R)

    # 圆角8
    fillet_8_edges = [part.edges().sort_by_distance(p)[0] for p in [
        (-41.613573407, -34.599722992, 8.5),
    ]]
    fillet(fillet_8_edges, radius=FILLET_8_R)

    # 圆角9
    fillet_9_edges = [part.edges().sort_by_distance(p)[0] for p in [
        (43.386426593, 25.400277008, 8.5),
    ]]
    fillet(fillet_9_edges, radius=FILLET_9_R)

    # 圆角10
    fillet_10_edges = [part.edges().sort_by_distance(p)[0] for p in [
        (43.386426593, -34.599722992, 8.5),
    ]]
    fillet(fillet_10_edges, radius=FILLET_10_R)

    # 草图9 → 切除-拉伸2 (cut)
    with BuildSketch(Plane(origin=(0, 0, 0), x_dir=(-1, 0, 0), z_dir=(0, 0, -1))):
        with BuildLine():
            Line((-35.686426593, -9.099722992), (-26.686426593, -9.099722992))
            ThreePointArc((-26.686426593, -9.099722992), (-25.979319812, -9.392616211), (-25.686426593, -10.099722992))
            Line((-25.686426593, -10.099722992), (-25.686426593, -18.099722992))
            ThreePointArc((-25.686426593, -18.099722992), (-25.979319812, -18.806829773), (-26.686426593, -19.099722992))
            Line((-26.686426593, -19.099722992), (-35.686426593, -19.099722992))
            ThreePointArc((-35.686426593, -19.099722992), (-36.393533374, -18.806829773), (-36.686426593, -18.099722992))
            Line((-36.686426593, -18.099722992), (-36.686426593, -10.099722992))
            ThreePointArc((-36.686426593, -10.099722992), (-36.393533374, -9.392616211), (-35.686426593, -9.099722992))
        make_face()
    extrude(amount=-CUT_EXTRUDE_2_DEPTH, mode=Mode.SUBTRACT)

    # 草图15 → 切除-拉伸4 (cut)
    with BuildSketch(Plane(origin=(0, 0, 0), x_dir=(-1, 0, 0), z_dir=(0, 0, -1))):
        with BuildLine():
            Line((-27.786426593, 23.860277008), (-16.786426593, 23.860277008))
            ThreePointArc((-16.786426593, 23.860277008), (-16.079319812, 23.567383789), (-15.786426593, 22.860277008))
            Line((-15.786426593, 22.860277008), (-15.786426593, 11.860277008))
            ThreePointArc((-15.786426593, 11.860277008), (-16.079319812, 11.153170227), (-16.786426593, 10.860277008))
            Line((-16.786426593, 10.860277008), (-27.786426593, 10.860277008))
            ThreePointArc((-27.786426593, 10.860277008), (-28.493533374, 11.153170227), (-28.786426593, 11.860277008))
            Line((-28.786426593, 11.860277008), (-28.786426593, 22.860277008))
            ThreePointArc((-28.786426593, 22.860277008), (-28.493533374, 23.567383789), (-27.786426593, 23.860277008))
        make_face()
    extrude(amount=-CUT_EXTRUDE_4_DEPTH, mode=Mode.SUBTRACT)

    # 草图16 → 切除-拉伸5 (cut)
    with BuildSketch(Plane(origin=(0, 0, 0), x_dir=(-1, 0, 0), z_dir=(0, 0, -1))):
        with BuildLine():
            Line((-34.813624229, -35.44135644), (38.160584986, 24.594541811))
            ThreePointArc((38.160584986, 24.594541811), (40.271939959, 24.389163681), (40.066561829, 22.277808707))
            Line((40.066561829, 22.277808707), (-32.907647386, -37.758089544))
            ThreePointArc((-32.907647386, -37.758089544), (-35.01900236, -37.552711413), (-34.813624229, -35.44135644))
        make_face()
        with BuildLine():
            Line((-24.812669862, -35.442516483), (38.160584986, 16.365594372))
            ThreePointArc((38.160584986, 16.365594372), (40.271939959, 16.160216241), (40.066561829, 14.048861268))
            Line((40.066561829, 14.048861268), (-22.906693019, -37.759249587))
            ThreePointArc((-22.906693019, -37.759249587), (-25.018047992, -37.553871456), (-24.812669862, -35.442516483))
        make_face()
        with BuildLine():
            Line((-14.847589681, -35.400071108), (38.160584986, 8.209766053))
            ThreePointArc((38.160584986, 8.209766053), (40.271939959, 8.004387922), (40.066561829, 5.893032949))
            Line((40.066561829, 5.893032949), (-12.941612838, -37.716804211))
            ThreePointArc((-12.941612838, -37.716804211), (-15.052967812, -37.511426081), (-14.847589681, -35.400071108))
        make_face()
        with BuildLine():
            Line((-4.829036756, -35.422622366), (37.207596564, -0.839074727))
            ThreePointArc((37.207596564, -0.839074727), (39.318951538, -1.044452857), (39.113573407, -3.155807831))
            Line((39.113573407, -3.155807831), (-2.923059913, -37.73935547))
            ThreePointArc((-2.923059913, -37.73935547), (-5.034414886, -37.533977339), (-4.829036756, -35.422622366))
        make_face()
        with BuildLine():
            Line((5.225028189, -35.488338825), (38.160584986, -8.392248878))
            ThreePointArc((38.160584986, -8.392248878), (40.271939959, -8.597627008), (40.066561829, -10.708981982))
            Line((40.066561829, -10.708981982), (7.131005032, -37.805071928))
            ThreePointArc((7.131005032, -37.805071928), (5.019650059, -37.599693798), (5.225028189, -35.488338825))
        make_face()
        with BuildLine():
            Line((15.163430095, -35.413465752), (38.160584986, -16.493701277))
            ThreePointArc((38.160584986, -16.493701277), (40.271939959, -16.699079408), (40.066561829, -18.810434381))
            Line((40.066561829, -18.810434381), (17.069406938, -37.730198855))
            ThreePointArc((17.069406938, -37.730198855), (14.958051965, -37.524820725), (15.163430095, -35.413465752))
        make_face()
        with BuildLine():
            Line((25.084557237, -35.317595037), (38.160584986, -24.559944081))
            ThreePointArc((38.160584986, -24.559944081), (40.271939959, -24.765322212), (40.066561829, -26.876677185))
            Line((40.066561829, -26.876677185), (26.99053408, -37.63432814))
            ThreePointArc((26.99053408, -37.63432814), (24.879179106, -37.42895001), (25.084557237, -35.317595037))
        make_face()
        with BuildLine():
            Line((35.108876828, -35.347155733), (38.160584986, -32.836514749))
            ThreePointArc((38.160584986, -32.836514749), (40.271939959, -33.041892879), (40.066561829, -35.153247853))
            Line((40.066561829, -35.153247853), (37.014853671, -37.663888837))
            ThreePointArc((37.014853671, -37.663888837), (34.903498698, -37.458510706), (35.108876828, -35.347155733))
        make_face()
    extrude(amount=-CUT_EXTRUDE_5_DEPTH, mode=Mode.SUBTRACT)


solid = part.part
